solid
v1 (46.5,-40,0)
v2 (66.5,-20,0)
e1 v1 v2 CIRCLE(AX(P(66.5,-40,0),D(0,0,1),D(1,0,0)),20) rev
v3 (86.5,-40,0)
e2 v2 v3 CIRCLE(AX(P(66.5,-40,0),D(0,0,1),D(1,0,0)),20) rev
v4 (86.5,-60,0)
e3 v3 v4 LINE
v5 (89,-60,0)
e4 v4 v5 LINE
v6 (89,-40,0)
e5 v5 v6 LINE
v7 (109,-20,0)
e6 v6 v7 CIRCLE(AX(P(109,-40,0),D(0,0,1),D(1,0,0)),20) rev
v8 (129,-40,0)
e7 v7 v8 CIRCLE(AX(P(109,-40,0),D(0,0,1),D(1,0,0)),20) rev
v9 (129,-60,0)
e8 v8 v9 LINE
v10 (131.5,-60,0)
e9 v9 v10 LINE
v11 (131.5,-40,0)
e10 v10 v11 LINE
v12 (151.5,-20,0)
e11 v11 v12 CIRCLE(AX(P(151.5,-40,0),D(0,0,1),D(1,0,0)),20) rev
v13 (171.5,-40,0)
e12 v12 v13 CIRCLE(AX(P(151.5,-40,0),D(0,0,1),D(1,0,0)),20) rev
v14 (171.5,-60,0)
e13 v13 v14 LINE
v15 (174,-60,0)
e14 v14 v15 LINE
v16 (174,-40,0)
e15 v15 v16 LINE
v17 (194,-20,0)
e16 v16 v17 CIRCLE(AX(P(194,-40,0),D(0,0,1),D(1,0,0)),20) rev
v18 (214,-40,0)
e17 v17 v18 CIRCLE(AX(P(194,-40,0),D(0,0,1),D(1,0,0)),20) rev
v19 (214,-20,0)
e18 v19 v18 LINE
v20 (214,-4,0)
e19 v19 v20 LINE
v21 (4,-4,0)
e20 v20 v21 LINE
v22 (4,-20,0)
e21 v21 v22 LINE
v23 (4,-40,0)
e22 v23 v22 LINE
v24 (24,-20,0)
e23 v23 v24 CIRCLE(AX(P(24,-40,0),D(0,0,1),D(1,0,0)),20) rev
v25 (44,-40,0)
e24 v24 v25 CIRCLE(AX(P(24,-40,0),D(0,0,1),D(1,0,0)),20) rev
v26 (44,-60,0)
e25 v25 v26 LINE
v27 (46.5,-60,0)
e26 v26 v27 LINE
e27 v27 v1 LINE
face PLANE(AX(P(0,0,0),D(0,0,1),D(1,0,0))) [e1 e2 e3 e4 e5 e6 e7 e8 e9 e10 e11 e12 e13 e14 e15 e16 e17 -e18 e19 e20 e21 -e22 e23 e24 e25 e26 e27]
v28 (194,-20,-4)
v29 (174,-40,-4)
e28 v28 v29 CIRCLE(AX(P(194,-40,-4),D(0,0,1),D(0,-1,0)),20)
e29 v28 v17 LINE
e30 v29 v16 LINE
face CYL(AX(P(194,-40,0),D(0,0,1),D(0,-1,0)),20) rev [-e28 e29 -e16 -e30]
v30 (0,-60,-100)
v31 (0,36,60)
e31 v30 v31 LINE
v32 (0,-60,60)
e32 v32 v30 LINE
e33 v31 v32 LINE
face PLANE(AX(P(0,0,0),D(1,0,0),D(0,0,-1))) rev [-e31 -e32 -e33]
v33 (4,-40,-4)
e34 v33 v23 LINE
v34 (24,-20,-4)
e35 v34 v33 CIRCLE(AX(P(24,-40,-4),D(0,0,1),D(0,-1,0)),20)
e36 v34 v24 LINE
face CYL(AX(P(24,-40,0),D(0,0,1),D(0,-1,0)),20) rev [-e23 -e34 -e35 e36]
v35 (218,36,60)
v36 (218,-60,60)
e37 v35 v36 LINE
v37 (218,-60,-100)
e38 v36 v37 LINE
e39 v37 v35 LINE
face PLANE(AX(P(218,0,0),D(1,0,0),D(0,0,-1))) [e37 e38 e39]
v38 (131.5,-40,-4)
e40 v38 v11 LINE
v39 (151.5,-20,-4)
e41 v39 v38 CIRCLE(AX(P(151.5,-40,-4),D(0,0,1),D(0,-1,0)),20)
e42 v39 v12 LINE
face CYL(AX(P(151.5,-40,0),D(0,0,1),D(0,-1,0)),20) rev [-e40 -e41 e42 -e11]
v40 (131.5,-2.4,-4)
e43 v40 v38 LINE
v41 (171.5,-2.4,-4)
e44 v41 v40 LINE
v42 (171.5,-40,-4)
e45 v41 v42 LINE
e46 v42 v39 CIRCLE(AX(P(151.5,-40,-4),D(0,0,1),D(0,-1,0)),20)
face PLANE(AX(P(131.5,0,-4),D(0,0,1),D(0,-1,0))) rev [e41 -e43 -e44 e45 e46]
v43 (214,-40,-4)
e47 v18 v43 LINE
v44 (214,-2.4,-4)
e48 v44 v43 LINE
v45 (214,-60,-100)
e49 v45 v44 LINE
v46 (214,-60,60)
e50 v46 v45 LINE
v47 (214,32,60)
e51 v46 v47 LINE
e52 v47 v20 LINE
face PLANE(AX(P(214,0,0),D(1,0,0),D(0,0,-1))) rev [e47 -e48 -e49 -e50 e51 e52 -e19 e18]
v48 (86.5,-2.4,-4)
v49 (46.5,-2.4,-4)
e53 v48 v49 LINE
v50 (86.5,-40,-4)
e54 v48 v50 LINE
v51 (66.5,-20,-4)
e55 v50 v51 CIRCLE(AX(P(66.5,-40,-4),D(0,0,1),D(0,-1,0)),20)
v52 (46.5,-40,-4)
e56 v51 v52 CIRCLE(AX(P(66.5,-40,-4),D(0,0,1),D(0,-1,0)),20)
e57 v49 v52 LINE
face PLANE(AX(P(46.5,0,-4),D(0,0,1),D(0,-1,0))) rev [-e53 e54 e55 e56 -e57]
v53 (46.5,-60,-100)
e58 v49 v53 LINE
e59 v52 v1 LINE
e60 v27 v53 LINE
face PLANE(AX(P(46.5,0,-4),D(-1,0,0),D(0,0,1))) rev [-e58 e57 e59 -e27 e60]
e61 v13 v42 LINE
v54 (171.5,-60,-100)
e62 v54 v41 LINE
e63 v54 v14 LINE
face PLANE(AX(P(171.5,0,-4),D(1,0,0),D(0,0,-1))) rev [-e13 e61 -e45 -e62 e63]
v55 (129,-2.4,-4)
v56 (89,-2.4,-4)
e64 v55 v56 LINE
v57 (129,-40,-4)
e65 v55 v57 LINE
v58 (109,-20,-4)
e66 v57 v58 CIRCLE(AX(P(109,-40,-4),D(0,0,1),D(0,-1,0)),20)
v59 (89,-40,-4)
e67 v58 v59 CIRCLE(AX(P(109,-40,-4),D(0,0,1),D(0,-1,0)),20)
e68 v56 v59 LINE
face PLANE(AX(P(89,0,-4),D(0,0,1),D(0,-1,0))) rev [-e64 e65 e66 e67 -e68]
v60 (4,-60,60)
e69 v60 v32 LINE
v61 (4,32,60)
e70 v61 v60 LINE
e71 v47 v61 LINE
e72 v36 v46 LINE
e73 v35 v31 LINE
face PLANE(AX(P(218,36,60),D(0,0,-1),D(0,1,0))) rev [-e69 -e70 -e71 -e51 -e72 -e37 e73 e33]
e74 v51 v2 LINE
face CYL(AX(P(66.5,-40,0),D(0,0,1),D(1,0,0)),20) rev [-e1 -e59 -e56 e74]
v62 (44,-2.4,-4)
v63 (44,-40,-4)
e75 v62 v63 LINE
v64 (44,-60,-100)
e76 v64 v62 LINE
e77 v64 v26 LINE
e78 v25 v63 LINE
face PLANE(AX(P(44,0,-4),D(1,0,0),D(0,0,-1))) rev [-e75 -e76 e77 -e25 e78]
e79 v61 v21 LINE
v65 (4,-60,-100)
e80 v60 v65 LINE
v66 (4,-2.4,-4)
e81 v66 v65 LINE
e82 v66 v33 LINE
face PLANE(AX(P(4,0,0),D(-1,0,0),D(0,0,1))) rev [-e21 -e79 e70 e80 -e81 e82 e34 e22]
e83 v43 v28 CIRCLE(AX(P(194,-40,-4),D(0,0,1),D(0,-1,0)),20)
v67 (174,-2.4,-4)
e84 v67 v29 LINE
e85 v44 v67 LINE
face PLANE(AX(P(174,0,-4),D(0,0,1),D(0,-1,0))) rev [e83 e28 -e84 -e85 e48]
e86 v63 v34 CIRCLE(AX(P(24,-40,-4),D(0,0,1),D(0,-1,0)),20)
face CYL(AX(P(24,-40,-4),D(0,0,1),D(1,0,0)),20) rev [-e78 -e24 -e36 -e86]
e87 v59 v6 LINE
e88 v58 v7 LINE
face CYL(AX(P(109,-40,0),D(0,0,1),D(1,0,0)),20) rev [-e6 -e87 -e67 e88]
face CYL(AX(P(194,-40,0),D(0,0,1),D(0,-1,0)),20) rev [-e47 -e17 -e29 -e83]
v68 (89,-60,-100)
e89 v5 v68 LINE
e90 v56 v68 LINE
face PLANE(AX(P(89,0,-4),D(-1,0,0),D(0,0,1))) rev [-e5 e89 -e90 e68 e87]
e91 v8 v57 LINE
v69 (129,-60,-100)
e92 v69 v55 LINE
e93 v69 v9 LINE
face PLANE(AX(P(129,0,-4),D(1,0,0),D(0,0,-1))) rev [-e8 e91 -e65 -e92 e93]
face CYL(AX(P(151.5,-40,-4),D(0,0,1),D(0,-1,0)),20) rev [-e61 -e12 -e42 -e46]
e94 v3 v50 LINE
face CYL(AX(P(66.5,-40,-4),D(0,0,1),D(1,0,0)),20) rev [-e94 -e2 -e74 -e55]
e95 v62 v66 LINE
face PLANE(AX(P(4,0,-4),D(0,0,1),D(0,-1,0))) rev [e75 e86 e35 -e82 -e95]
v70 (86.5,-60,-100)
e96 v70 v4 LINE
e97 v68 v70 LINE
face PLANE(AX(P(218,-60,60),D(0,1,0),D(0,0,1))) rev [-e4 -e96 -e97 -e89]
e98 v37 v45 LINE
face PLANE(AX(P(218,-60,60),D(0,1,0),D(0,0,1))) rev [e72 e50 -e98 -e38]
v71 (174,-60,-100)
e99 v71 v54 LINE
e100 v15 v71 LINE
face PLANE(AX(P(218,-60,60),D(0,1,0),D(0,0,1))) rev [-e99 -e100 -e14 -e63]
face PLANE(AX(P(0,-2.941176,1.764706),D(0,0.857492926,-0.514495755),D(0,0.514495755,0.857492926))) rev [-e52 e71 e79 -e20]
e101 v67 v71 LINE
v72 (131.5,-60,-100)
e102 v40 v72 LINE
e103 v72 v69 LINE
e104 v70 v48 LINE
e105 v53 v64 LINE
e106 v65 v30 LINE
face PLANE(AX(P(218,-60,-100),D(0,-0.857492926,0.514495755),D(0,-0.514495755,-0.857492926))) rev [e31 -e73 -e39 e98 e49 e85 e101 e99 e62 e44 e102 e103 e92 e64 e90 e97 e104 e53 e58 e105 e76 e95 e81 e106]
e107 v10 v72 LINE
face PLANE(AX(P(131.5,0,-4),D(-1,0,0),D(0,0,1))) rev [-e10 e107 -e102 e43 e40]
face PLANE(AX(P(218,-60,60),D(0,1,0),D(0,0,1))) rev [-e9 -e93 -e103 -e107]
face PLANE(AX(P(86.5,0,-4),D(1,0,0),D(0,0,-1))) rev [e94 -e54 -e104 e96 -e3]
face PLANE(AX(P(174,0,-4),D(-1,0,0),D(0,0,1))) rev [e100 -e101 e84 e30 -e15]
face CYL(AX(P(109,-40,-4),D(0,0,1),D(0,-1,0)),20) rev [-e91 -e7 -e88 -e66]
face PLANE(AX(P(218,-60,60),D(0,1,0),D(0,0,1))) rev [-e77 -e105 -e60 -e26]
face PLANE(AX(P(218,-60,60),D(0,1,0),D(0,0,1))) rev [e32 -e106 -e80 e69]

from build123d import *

# Parameters (mm, degrees)
SALIENTE_EXTRUIR1_DEPTH = 218
CROQUIS4_W              = 40.00000000000003
CROQUIS4_H              = 96.00000000000001
CORTAR_EXTRUIR1_DEPTH   = 60
CORTAR_EXTRUIR2_DEPTH   = 4
REDONDEO1_R             = 20


with BuildPart() as part:
    # Croquis2 → Saliente-Extruir1 (new body)
    with BuildSketch(Plane(origin=(0, 0, 0), x_dir=(0, 0, -1), z_dir=(1, 0, 0))):
        Polygon((-60.000000000000014, 35.99999999999998), (-59.99999999999997, -60), (100, -59.99999999999999), align=None)
    extrude(amount=SALIENTE_EXTRUIR1_DEPTH)

    # Croquis3 → Cortar-Recubrir1 section 0
    with BuildSketch(Plane.XY.offset(60)):
        with BuildLine():
            Line((4, 32), (214, 32))
            Line((214, 32), (214, -59.99999999999997))
            Line((214, -59.99999999999997), (4.0000000000000115, -59.99999999999997))
            Line((4.0000000000000115, -59.99999999999997), (4, 32))
        make_face()
    # Croquis3D3 → Cortar-Recubrir1 section 1
    with BuildSketch(Plane(origin=(4, -3.9999999999999964, 0), x_dir=(0.9662349396012463, -0.25766265056033233, 0), z_dir=(0, 0, 1))):
        with BuildLine():
            Line((0, 0), (202.9093373162617, 54.10915661766981))
            Line((202.9093373162617, 54.10915661766981), (217.33844574764032, 0))
            Line((217.33844574764032, 0), (14.42910843137861, -54.1091566176698))
            Line((14.42910843137861, -54.1091566176698), (0, 0))
        make_face()
    loft(mode=Mode.SUBTRACT)

    # Croquis4 → Cortar-Extruir1 (cut)
    with BuildSketch(Plane.XZ.offset(60)):
        Polygon((3.999999999999988, -4), (43.99999999999999, -4), (44.00000000000001, -100), (4, -100), align=None)
        Polygon((46.499999999999986, -4), (86.49999999999999, -4), (86.5, -100), (46.5, -100), align=None)
        Polygon((88.99999999999999, -3.9999999999999973), (128.99999999999997, -3.9999999999999973), (128.99999999999997, -100), (89, -100), align=None)
        with Locations((151.5, -52.00000000000001)):
            Rectangle(CROQUIS4_W, CROQUIS4_H)
        with Locations((194, -52.00000000000001)):
            Rectangle(CROQUIS4_W, CROQUIS4_H)
    extrude(amount=-CORTAR_EXTRUIR1_DEPTH, mode=Mode.SUBTRACT)

    # Croquis5 → Cortar-Extruir2 (cut)
    with BuildSketch(Plane(origin=(0, 1.7e-16, -4), x_dir=(-1, 0, 0), z_dir=(0, 4e-17, -1))):
        Polygon((-194, -60), (-174.00000000000003, -60.00000000000001), (-174.00000000000003, -19.99999999999999), (-214, -19.999999999999996), (-214, -60), align=None)
        Polygon((-151.49999999999997, -60), (-131.49999999999997, -60), (-131.49999999999997, -19.99999999999999), (-171.5, -19.999999999999996), (-171.49999999999997, -60), align=None)
        Polygon((-108.99999999999999, -60), (-88.99999999999999, -60), (-88.99999999999999, -19.999999999999996), (-128.99999999999997, -20), (-128.99999999999997, -60), align=None)
        Polygon((-66.49999999999997, -60), (-46.49999999999997, -60), (-46.49999999999997, -19.999999999999996), (-86.5, -19.999999999999996), (-86.49999999999999, -60), align=None)
        Polygon((-23.99999999999999, -60), (-3.99999999999999, -60), (-3.99999999999999, -19.99999999999999), (-43.99999999999999, -19.999999999999996), (-43.99999999999999, -60), align=None)
    extrude(amount=-CORTAR_EXTRUIR2_DEPTH, mode=Mode.SUBTRACT)

    # Redondeo1
    redondeo1_edges = [part.edges().sort_by_distance(p)[0] for p in [
        (3.99999999999999, -19.99999999999999, -2.000000000000001),
        (43.99999999999999, -19.999999999999996, -2.000000000000001),
        (46.49999999999997, -19.999999999999996, -2.000000000000001),
        (86.5, -19.999999999999996, -2.000000000000001),
        (88.99999999999999, -19.999999999999996, -2.000000000000001),
        (128.99999999999997, -20, -2.000000000000001),
        (131.49999999999997, -19.99999999999999, -2.000000000000001),
        (171.5, -19.999999999999996, -2.000000000000001),
        (174.00000000000003, -19.99999999999999, -2.000000000000001),
        (214, -19.999999999999996, -2.000000000000001),
    ]]
    fillet(redondeo1_edges, radius=REDONDEO1_R - 0.0001)  # a hair under: the kernel refuses the full size


solid = part.part
